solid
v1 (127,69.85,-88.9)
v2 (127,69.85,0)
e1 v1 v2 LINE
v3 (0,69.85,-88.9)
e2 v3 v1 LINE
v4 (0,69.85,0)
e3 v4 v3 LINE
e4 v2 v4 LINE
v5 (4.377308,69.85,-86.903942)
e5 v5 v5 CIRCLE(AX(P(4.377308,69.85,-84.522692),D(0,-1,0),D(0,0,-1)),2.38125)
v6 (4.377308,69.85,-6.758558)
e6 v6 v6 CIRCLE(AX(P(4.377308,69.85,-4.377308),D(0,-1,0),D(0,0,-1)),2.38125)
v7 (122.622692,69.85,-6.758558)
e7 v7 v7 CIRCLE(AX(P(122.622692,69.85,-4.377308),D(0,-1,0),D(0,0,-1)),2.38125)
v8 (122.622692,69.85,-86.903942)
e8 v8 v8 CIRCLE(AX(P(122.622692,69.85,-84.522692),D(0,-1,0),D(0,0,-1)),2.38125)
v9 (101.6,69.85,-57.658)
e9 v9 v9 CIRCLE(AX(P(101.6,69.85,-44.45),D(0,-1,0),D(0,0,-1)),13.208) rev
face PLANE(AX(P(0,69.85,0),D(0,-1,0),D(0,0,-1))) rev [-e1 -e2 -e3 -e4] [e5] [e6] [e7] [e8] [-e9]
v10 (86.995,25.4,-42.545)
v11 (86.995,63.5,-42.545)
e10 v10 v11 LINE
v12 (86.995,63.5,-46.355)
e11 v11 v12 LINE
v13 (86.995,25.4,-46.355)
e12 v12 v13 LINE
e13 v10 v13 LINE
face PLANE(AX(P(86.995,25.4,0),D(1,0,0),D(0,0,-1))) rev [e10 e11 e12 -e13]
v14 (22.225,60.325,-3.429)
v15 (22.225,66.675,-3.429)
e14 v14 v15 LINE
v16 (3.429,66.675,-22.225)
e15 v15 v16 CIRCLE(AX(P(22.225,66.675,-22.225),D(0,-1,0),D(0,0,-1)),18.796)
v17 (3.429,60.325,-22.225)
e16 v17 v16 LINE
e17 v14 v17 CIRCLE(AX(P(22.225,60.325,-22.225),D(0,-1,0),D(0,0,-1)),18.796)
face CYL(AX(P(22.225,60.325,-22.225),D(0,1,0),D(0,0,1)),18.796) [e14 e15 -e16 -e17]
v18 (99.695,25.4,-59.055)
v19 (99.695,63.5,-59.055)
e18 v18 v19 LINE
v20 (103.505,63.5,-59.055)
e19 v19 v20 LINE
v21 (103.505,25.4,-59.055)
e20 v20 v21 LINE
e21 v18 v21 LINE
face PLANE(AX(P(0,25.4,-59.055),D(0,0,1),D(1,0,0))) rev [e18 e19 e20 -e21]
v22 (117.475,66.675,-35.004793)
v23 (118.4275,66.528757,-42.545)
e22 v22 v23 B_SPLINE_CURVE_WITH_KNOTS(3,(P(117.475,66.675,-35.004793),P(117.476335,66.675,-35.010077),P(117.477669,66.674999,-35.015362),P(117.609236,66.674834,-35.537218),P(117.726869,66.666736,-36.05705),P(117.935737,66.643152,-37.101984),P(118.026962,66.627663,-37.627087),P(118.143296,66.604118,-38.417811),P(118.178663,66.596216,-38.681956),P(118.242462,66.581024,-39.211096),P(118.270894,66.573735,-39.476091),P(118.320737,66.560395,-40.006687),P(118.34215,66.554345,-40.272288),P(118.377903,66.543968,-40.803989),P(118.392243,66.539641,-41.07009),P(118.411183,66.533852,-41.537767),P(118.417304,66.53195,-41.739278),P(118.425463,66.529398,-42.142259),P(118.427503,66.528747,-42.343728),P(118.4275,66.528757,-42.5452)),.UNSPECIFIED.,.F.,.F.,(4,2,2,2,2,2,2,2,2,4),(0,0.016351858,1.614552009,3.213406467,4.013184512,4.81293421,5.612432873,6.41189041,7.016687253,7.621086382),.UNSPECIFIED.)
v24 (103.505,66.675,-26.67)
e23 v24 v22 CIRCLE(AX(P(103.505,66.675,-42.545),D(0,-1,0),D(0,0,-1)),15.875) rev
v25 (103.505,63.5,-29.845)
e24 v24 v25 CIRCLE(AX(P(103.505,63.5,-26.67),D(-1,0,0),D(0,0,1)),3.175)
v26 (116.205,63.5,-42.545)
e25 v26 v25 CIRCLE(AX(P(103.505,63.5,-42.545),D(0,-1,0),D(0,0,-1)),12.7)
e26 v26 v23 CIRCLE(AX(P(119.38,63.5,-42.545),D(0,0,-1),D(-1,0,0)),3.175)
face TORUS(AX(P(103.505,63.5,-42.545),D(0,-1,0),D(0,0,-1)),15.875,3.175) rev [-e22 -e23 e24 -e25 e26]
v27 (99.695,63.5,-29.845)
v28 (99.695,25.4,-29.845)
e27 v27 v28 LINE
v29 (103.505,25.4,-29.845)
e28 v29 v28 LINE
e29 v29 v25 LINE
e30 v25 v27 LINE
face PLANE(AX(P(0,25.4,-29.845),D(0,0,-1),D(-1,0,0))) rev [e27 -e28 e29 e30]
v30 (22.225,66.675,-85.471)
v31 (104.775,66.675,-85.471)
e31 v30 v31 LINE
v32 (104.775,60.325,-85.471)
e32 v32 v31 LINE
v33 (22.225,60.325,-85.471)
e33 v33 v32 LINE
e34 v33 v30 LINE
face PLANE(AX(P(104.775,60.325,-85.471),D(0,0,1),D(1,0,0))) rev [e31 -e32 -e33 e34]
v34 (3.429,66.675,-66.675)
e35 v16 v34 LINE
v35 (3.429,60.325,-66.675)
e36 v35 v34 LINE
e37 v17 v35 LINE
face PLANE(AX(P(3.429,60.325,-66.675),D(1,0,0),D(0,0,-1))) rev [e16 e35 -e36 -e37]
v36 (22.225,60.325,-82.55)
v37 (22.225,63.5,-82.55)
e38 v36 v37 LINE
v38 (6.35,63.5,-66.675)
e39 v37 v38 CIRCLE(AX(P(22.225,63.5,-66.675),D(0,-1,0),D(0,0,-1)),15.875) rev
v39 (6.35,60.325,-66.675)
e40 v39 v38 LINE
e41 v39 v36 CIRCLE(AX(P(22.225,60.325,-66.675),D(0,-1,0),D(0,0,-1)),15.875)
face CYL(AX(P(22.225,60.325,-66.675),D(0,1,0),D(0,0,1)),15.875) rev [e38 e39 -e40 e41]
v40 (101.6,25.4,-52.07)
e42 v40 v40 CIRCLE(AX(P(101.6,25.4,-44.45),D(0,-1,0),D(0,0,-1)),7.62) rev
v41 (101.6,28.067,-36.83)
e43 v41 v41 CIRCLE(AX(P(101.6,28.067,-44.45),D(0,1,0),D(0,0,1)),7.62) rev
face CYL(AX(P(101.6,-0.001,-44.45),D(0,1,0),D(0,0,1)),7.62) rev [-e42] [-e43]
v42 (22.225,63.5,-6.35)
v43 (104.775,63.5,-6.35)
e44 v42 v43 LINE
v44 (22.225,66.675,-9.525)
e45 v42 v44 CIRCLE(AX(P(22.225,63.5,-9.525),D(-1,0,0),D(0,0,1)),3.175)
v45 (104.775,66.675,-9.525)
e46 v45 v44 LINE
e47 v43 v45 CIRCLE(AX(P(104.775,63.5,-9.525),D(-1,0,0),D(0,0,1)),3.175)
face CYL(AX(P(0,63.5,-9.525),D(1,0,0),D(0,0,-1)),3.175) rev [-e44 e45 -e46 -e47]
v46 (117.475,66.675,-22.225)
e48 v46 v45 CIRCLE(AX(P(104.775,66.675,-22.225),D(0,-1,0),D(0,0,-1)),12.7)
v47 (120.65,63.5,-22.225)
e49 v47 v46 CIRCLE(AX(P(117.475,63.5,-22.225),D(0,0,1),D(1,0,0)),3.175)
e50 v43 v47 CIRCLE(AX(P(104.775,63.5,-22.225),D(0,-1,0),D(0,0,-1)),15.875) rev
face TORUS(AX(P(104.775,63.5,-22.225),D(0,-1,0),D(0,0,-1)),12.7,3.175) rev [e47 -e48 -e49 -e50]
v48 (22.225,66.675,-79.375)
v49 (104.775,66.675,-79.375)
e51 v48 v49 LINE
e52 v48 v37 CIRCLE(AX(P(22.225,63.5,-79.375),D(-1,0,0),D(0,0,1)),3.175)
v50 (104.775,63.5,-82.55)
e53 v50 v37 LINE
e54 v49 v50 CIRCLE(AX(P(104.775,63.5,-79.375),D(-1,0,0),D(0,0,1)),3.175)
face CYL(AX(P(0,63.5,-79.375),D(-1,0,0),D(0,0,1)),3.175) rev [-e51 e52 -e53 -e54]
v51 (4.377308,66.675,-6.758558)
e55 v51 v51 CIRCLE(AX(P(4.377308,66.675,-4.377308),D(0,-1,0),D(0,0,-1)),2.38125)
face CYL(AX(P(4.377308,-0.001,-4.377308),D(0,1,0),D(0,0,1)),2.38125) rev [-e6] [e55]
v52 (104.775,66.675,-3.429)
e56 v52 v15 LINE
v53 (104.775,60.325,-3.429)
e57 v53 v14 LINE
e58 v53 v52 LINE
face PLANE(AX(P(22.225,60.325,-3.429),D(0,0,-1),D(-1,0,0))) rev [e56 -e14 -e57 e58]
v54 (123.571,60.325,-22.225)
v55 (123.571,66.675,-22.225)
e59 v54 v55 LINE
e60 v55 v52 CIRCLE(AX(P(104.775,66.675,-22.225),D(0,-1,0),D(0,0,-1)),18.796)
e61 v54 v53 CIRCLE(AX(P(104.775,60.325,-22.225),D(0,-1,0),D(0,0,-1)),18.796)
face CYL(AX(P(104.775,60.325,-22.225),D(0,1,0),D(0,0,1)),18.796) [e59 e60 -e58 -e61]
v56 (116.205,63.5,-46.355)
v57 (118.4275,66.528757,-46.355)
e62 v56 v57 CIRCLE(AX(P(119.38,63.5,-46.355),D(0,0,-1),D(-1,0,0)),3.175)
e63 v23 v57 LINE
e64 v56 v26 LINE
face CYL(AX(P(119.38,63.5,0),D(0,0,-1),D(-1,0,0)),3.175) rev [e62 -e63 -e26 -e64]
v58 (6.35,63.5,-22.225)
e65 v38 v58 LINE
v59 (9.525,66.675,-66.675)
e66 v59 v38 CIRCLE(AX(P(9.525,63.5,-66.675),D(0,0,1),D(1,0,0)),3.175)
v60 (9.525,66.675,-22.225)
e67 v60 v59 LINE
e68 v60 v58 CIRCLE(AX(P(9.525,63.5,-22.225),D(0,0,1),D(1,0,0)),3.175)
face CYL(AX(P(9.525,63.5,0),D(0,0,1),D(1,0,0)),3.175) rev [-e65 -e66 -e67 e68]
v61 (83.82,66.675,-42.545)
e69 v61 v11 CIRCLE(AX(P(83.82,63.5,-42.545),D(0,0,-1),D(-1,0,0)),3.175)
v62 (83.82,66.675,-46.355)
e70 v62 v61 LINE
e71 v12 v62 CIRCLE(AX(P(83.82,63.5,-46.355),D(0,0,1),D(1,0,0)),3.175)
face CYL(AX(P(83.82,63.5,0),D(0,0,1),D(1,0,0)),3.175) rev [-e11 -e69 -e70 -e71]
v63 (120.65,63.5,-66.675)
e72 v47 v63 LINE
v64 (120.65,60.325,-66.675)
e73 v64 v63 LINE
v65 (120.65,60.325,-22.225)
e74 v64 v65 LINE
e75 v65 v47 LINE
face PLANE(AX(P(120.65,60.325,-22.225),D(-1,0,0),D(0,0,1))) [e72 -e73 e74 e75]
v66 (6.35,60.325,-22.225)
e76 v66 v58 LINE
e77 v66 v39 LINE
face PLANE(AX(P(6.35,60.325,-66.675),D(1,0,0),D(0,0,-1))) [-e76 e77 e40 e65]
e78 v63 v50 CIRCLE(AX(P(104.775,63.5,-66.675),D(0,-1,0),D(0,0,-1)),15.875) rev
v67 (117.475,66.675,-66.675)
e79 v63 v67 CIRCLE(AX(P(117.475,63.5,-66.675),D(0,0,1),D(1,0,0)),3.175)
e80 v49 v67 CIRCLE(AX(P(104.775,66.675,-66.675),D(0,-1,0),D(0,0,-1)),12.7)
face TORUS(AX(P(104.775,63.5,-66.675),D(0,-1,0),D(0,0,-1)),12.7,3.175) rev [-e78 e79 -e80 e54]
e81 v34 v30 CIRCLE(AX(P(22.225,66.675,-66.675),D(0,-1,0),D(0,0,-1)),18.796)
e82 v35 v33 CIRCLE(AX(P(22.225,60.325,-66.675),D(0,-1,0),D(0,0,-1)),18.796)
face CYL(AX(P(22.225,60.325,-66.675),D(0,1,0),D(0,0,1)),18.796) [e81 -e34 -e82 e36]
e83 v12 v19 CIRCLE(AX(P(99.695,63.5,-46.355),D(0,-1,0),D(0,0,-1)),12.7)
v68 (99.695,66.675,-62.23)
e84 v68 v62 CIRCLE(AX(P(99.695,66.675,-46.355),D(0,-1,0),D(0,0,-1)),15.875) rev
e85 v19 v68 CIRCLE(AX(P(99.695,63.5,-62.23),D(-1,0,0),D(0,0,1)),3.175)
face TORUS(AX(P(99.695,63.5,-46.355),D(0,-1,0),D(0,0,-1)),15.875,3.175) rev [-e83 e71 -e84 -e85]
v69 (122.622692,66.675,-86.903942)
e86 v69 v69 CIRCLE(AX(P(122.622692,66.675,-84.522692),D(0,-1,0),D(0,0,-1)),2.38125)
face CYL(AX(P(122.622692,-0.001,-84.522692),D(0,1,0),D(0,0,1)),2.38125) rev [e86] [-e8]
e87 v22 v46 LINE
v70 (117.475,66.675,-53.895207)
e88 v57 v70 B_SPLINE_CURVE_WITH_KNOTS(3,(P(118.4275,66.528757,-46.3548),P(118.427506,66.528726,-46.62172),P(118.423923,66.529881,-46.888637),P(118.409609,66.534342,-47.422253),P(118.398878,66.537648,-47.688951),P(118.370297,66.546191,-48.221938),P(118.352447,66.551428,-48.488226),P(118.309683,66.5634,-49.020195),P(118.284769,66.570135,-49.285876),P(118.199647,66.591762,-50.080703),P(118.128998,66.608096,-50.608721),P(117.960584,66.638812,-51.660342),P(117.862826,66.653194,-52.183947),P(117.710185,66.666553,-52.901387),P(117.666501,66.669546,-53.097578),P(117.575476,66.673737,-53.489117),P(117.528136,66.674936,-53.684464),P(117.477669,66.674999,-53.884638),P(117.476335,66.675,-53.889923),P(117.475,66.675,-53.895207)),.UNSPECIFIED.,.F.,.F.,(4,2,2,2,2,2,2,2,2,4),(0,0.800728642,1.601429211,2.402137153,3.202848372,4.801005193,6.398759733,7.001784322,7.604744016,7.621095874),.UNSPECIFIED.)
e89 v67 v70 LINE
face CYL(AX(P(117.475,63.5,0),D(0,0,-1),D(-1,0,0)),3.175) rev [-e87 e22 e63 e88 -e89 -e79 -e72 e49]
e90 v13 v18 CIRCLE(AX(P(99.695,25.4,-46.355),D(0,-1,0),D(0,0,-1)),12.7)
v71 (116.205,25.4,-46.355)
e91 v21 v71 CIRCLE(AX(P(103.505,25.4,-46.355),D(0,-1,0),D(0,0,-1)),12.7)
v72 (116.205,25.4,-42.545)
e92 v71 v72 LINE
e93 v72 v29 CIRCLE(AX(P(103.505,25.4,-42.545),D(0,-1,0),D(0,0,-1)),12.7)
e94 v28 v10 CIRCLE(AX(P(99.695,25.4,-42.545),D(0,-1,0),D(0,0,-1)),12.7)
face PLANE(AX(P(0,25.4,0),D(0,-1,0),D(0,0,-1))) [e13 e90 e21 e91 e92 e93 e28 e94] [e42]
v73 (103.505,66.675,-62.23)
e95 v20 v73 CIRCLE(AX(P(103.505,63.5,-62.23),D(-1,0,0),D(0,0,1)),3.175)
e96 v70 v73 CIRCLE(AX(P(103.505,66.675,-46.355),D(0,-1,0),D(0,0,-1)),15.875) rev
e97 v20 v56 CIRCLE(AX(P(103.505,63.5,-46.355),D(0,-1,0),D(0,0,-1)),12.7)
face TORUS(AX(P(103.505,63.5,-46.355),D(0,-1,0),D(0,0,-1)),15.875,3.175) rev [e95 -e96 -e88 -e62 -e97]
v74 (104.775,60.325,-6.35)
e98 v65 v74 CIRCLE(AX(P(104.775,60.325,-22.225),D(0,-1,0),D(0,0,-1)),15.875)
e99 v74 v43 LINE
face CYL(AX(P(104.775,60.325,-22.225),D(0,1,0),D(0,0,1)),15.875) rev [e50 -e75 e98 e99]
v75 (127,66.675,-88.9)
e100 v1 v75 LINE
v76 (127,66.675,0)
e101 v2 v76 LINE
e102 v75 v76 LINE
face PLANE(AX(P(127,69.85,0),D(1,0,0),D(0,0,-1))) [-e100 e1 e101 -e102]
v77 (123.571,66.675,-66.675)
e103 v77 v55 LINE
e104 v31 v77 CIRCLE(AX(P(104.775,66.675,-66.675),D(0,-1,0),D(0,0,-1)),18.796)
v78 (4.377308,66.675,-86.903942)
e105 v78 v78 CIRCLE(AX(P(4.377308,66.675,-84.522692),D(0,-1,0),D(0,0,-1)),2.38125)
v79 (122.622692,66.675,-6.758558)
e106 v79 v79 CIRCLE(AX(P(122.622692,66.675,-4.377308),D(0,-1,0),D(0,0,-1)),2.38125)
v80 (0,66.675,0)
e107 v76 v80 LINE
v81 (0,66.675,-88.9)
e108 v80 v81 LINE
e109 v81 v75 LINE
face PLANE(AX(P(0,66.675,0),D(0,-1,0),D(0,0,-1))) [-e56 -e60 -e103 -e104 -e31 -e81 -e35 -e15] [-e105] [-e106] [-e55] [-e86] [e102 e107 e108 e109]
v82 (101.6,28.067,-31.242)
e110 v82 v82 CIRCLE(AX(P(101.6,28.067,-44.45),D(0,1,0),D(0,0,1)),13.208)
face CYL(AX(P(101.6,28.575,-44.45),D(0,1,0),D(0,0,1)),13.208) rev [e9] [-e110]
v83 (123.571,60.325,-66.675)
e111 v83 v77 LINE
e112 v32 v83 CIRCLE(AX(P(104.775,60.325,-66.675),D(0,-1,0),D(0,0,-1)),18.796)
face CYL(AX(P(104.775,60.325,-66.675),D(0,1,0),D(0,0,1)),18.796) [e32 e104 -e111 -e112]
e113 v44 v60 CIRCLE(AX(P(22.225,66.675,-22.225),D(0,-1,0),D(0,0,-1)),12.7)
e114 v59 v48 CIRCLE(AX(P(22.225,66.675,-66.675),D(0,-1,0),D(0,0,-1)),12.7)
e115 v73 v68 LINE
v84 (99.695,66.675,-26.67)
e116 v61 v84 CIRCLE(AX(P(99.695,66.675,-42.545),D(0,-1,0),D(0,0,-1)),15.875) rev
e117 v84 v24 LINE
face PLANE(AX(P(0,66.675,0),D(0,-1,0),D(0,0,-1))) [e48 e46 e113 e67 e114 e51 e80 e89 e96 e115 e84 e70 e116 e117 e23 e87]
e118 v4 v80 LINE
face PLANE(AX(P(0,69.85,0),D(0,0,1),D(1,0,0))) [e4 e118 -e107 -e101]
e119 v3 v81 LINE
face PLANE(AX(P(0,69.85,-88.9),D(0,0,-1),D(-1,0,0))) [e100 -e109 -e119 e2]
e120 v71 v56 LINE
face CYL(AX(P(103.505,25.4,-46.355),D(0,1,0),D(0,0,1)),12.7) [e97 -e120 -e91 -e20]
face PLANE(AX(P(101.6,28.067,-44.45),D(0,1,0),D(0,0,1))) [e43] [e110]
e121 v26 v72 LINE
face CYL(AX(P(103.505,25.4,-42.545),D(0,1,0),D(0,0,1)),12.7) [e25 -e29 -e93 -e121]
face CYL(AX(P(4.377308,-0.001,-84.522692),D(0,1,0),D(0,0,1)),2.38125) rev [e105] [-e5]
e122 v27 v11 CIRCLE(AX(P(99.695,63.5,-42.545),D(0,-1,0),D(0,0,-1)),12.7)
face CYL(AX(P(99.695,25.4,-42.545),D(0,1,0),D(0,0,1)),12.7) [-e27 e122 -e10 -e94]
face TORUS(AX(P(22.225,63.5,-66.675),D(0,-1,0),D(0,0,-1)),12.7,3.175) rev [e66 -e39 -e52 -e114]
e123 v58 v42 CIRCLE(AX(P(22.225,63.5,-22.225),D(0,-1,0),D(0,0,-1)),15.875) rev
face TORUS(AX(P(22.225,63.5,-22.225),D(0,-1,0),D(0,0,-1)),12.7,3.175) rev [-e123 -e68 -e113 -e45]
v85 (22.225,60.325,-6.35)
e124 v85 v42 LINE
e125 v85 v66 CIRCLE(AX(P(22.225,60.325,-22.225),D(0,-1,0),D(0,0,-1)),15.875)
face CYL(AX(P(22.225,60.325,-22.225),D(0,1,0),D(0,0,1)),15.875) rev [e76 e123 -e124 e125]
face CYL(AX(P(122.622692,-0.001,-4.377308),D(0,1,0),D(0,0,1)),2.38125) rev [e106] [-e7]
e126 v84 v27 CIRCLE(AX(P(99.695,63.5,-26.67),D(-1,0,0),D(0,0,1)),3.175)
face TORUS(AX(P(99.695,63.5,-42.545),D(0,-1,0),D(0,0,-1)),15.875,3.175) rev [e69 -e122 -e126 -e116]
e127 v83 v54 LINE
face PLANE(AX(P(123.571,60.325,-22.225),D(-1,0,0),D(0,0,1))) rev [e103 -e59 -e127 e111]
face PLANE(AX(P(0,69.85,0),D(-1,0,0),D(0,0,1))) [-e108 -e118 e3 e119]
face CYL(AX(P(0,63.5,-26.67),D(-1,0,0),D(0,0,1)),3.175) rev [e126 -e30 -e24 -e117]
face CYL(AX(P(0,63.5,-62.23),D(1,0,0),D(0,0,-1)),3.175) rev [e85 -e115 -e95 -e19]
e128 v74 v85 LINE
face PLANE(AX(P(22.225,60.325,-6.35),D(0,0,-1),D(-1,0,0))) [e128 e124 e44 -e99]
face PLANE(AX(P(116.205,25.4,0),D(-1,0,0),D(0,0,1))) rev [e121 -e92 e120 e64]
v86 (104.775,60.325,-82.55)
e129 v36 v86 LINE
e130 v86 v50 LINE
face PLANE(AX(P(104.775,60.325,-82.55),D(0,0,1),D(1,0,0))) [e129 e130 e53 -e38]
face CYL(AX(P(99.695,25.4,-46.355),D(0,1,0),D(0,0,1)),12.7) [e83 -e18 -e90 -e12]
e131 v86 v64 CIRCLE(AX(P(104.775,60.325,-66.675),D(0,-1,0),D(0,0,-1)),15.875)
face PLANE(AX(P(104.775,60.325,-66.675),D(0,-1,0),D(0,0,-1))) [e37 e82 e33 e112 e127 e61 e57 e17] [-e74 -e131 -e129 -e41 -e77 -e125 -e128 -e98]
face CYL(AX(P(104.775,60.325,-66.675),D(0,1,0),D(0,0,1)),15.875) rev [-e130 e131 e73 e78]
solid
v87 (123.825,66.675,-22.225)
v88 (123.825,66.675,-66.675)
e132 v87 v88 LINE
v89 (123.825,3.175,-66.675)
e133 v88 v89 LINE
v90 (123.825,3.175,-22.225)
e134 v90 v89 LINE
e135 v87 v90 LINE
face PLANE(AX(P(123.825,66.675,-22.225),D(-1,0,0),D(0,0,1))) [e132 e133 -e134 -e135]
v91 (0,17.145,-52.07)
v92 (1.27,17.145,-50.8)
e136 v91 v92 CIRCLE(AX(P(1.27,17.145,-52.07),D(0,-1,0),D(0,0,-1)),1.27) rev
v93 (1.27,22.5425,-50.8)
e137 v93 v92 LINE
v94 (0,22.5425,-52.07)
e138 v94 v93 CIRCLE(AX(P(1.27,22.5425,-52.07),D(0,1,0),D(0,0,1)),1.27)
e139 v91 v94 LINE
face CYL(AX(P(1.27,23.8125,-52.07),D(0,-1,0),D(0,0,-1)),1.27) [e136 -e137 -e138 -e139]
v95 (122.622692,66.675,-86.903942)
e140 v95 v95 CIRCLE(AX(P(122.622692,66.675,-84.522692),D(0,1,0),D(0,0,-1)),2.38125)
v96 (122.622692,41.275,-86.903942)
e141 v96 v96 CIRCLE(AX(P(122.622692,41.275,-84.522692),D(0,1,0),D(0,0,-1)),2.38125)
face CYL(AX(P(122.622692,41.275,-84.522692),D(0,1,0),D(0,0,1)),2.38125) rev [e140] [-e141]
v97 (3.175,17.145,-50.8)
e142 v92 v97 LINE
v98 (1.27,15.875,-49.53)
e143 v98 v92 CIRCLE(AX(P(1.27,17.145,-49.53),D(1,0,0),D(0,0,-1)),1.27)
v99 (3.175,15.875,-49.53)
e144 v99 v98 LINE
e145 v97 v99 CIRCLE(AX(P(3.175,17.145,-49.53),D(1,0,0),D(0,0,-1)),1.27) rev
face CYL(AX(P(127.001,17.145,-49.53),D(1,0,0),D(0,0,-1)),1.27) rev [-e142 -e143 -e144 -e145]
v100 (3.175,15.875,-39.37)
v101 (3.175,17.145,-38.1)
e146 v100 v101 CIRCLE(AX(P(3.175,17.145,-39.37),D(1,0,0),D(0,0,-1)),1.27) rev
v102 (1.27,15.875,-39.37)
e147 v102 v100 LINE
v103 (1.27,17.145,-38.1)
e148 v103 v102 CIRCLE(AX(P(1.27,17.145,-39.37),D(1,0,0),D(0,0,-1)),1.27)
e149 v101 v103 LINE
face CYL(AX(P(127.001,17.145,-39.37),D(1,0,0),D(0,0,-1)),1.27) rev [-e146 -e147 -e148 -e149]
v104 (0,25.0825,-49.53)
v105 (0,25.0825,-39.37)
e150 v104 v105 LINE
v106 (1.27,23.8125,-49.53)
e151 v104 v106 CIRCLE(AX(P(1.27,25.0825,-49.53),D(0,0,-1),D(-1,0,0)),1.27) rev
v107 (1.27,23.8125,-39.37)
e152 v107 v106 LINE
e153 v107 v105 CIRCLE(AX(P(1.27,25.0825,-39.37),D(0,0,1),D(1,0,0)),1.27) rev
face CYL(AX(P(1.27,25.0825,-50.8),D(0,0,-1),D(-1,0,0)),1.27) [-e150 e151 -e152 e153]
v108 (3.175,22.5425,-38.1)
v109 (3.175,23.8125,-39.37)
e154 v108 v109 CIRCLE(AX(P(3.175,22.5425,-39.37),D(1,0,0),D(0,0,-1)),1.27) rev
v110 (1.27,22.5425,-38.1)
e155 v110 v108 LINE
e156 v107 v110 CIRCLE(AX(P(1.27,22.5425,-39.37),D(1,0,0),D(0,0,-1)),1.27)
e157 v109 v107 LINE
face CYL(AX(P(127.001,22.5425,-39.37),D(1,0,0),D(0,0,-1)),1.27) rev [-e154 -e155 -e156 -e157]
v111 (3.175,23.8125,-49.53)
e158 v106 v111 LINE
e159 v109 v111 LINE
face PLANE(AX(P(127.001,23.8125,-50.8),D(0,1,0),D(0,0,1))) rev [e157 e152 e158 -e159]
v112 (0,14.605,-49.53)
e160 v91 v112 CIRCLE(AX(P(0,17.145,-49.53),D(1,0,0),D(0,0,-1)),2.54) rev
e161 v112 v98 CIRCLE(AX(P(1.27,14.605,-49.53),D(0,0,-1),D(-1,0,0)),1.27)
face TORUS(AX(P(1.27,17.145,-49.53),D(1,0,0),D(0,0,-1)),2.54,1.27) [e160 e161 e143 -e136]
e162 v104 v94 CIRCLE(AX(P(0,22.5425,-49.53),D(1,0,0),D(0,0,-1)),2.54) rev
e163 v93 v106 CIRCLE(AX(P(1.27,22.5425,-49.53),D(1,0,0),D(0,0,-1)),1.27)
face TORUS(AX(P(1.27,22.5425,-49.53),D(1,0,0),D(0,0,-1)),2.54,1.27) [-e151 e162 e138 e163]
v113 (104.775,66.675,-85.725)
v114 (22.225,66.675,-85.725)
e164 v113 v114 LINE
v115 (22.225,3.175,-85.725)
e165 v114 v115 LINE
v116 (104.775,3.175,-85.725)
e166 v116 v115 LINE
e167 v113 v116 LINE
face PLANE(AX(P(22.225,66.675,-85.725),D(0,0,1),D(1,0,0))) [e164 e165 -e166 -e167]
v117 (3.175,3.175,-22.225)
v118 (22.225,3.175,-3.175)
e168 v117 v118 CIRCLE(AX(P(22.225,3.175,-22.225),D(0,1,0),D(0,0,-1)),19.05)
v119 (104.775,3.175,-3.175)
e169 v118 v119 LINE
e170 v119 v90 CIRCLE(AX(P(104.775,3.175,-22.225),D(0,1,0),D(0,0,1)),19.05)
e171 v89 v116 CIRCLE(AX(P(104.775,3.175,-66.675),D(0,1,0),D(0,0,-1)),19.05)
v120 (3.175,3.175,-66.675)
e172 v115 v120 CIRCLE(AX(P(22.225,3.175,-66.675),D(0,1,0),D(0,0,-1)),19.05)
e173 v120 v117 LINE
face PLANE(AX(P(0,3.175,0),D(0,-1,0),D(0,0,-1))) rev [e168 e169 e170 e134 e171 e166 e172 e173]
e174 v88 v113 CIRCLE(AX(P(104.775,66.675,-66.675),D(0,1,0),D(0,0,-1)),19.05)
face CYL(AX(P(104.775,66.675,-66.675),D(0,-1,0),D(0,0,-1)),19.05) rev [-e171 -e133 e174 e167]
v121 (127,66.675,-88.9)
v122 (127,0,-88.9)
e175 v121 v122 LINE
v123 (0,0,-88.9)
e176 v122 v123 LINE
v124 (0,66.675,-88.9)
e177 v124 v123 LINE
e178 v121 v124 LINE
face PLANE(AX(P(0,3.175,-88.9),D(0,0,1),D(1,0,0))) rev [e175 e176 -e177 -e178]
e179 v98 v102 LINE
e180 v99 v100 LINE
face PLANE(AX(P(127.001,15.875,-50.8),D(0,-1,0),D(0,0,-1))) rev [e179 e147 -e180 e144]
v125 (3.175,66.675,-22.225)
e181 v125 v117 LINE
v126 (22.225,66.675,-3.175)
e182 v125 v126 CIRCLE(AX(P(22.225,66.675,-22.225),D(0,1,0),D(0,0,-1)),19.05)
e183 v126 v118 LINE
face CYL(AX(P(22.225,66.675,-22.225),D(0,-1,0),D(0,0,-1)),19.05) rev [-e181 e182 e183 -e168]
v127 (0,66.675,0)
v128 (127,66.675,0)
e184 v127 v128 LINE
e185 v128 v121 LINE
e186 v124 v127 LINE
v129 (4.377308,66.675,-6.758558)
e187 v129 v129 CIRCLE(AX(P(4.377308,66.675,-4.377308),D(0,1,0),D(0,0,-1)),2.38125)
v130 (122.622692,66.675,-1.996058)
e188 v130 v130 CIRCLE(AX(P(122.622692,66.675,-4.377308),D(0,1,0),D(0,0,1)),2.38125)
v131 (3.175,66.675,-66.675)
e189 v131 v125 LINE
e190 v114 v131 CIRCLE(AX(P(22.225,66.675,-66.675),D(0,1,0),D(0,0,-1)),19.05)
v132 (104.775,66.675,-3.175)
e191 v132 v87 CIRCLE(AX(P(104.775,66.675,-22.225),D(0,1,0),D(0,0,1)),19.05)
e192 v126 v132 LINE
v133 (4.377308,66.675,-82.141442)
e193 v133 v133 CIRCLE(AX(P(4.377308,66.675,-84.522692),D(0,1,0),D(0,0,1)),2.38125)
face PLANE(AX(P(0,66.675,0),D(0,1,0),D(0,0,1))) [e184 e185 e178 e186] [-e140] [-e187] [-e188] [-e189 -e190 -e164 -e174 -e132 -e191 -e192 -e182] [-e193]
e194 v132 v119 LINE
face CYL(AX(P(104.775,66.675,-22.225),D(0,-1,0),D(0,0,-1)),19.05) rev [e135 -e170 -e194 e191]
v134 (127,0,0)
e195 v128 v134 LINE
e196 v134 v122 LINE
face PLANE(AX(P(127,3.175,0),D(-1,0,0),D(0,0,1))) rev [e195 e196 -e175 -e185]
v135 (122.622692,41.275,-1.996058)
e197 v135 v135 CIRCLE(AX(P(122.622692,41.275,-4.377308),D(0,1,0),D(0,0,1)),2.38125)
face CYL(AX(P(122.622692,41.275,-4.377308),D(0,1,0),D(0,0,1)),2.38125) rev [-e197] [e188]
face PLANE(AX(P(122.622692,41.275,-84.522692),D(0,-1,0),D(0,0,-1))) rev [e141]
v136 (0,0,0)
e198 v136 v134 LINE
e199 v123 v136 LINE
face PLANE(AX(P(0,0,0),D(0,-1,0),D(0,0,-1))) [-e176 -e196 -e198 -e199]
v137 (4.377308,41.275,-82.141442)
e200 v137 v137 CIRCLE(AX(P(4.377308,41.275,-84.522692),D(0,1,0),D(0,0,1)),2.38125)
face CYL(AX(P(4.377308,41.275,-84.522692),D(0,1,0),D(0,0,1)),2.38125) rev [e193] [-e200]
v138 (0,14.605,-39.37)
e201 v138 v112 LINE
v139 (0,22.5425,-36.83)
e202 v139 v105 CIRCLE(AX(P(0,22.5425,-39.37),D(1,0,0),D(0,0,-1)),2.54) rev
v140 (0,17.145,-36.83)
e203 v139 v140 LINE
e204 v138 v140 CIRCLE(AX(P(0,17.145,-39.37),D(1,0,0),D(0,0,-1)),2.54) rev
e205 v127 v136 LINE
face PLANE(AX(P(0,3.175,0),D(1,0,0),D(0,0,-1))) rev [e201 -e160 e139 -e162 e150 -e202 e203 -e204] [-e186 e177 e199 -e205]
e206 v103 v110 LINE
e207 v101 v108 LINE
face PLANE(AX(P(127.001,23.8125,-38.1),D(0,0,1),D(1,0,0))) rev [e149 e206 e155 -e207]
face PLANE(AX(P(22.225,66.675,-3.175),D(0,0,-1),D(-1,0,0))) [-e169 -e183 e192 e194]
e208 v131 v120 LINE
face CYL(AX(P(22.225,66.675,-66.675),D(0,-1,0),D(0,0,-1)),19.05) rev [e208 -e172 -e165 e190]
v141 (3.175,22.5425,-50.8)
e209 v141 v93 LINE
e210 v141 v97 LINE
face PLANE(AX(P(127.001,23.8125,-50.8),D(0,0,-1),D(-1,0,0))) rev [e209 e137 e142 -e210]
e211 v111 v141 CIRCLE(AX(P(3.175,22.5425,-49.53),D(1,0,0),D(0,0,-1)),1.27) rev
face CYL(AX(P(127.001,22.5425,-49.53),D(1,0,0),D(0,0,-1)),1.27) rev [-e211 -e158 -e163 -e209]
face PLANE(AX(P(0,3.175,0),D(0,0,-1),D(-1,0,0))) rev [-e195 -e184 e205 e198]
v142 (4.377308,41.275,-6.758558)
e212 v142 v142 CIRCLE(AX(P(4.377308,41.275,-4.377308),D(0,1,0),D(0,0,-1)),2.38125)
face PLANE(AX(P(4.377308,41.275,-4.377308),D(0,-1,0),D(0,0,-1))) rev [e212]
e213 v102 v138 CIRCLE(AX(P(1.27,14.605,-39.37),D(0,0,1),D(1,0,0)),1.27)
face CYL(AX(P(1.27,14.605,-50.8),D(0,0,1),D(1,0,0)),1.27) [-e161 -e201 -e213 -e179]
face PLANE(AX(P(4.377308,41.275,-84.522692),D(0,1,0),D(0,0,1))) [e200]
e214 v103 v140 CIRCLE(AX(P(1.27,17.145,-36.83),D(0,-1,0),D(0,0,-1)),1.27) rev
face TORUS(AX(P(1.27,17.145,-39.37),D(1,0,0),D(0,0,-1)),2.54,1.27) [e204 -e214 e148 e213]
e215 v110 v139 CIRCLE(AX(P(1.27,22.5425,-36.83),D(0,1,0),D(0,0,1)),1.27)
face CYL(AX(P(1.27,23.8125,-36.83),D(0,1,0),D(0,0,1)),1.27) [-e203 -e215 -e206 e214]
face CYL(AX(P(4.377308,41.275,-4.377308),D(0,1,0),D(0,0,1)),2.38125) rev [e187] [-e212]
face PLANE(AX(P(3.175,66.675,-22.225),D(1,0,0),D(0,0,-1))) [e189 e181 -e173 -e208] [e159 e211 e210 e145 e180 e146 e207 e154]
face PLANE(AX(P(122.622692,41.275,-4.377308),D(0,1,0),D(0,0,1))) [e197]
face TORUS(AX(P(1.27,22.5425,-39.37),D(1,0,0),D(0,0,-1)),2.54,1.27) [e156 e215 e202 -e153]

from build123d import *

# Parameters (mm, degrees)
SKETCH1_W           = 127
SKETCH1_H           = 88.9
BOSS_EXTRUDE1_DEPTH = 3.175
SKETCH2_W           = 127
SKETCH2_H           = 88.9
BOSS_EXTRUDE2_DEPTH = 63.5
BOSS_EXTRUDE3_START = 66.675
SKETCH1_2_W         = 127
SKETCH1_2_H         = 88.9
BOSS_EXTRUDE3_DEPTH = 3.175
SKETCH3_R           = 2.38125
CUT_EXTRUDE1_DEPTH  = 25.4
CUT_EXTRUDE2_START  = 3.175
SKETCH3_2_R         = 2.38125
CUT_EXTRUDE2_DEPTH  = 28.575
SKETCH4_R           = 7.62
CUT_EXTRUDE3_DEPTH  = 3.175
SKETCH5_W           = 12.7
SKETCH5_H           = 7.9375
CUT_EXTRUDE4_DEPTH  = 3.175
FILLET1_R           = 1.27
BOSS_EXTRUDE4_REACH = 169.675
SKETCH6_W           = 6.35
SKETCH6_H           = 9.525
MOVE_FACE1_BY       = 0.254
MOVE_FACE1_2_BY     = 0.254
MOVE_FACE1_3_BY     = 0.254
MOVE_FACE1_4_BY     = 0.254
BOSS_EXTRUDE5_REACH = 158.51
SKETCH7_W           = 6.35
SKETCH7_H           = 9.525
BOSS_EXTRUDE6_START = -3.175
SKETCH8_W           = 29.21
SKETCH8_H           = 29.21
BOSS_EXTRUDE6_DEPTH = 44.45
SKETCH4_3_R         = 7.62
CUT_EXTRUDE5_DEPTH  = 44.45
SKETCH9_R           = 12.7
CUT_EXTRUDE6_DEPTH  = 41.275
MOVE_FACE2_BY       = 0.508
MOVE_FACE3_BY       = 0.508
CUT_EXTRUDE7_DEPTH  = 9.525
BOSS_EXTRUDE7_START = 6.35
BOSS_EXTRUDE7_DEPTH = 6.35
FILLET4_R           = 12.7
FILLET5_R           = 3.175
MOVE_FACE4_BY       = 0.254
MOVE_FACE4_2_BY     = 0.254
MOVE_FACE4_3_BY     = 0.254
MOVE_FACE4_4_BY     = 0.254
MOVE_FACE4_5_BY     = 0.254
MOVE_FACE4_6_BY     = 0.254
MOVE_FACE4_7_BY     = 0.254
MOVE_FACE4_8_BY     = 0.254


with BuildPart() as part:
    # Sketch1 → Boss-Extrude1 (new body)
    with BuildSketch(Plane(origin=(0, 0, 0), x_dir=(1, 0, 0), z_dir=(0, 1, 0))):
        with Locations((63.5, 44.45)):
            Rectangle(SKETCH1_W, SKETCH1_H)
    extrude(amount=BOSS_EXTRUDE1_DEPTH)

    # Sketch2 → Boss-Extrude2 (add)
    with BuildSketch(Plane(origin=(0, 3.175, 0), x_dir=(1, 0, 0), z_dir=(0, 1, 0))):
        with Locations((63.5, 44.45)):
            Rectangle(SKETCH2_W, SKETCH2_H)
        with BuildLine():
            Line((22.225, 3.175), (104.775, 3.175))
            ThreePointArc((104.775, 3.175), (118.245384182, 8.754615818), (123.825, 22.225))
            Line((123.825, 22.225), (123.825, 66.675))
            ThreePointArc((123.825, 66.675), (118.245384182, 80.145384182), (104.775, 85.725))
            Line((104.775, 85.725), (22.225, 85.725))
            ThreePointArc((22.225, 85.725), (8.754615818, 80.145384182), (3.175, 66.675))
            Line((3.175, 66.675), (3.175, 22.225))
            ThreePointArc((3.175, 22.225), (8.754615818, 8.754615818), (22.225, 3.175))
        make_face(mode=Mode.SUBTRACT)
    extrude(amount=BOSS_EXTRUDE2_DEPTH)

    # Sketch3 → Cut-Extrude1 (cut)
    with BuildSketch(Plane(origin=(0, 66.675, 0), x_dir=(1, 0, 0), z_dir=(0, 1, 0))):
        with Locations(Location((4.377307909, 84.522692091, 0), (0, 0, 270))):
            Circle(SKETCH3_R)
        with Locations(Location((122.622692091, 4.377307909, 0), (0, 0, 270))):
            Circle(SKETCH3_R)
        with Locations(Location((122.622692091, 84.522692091, 0), (0, 0, 90))):
            Circle(SKETCH3_R)
        with Locations(Location((4.377307909, 4.377307909, 0), (0, 0, 90))):
            Circle(SKETCH3_R)
    extrude(amount=-CUT_EXTRUDE1_DEPTH, mode=Mode.SUBTRACT)

    # Sketch5 → Cut-Extrude4 (cut)
    with BuildSketch(Plane.ZY):
        with Locations((-44.45, 19.84375)):
            Rectangle(SKETCH5_W, SKETCH5_H)
    extrude(amount=-CUT_EXTRUDE4_DEPTH, mode=Mode.SUBTRACT)

    # Fillet1
    fillet1_edges = [part.edges().sort_by_distance(p)[0] for p in [
        (0, 19.84375, -38.1),
        (0, 23.8125, -44.45),
        (0, 19.84375, -50.8),
        (0, 15.875, -44.45),
        (1.5875, 23.8125, -50.8),
        (1.5875, 15.875, -50.8),
        (1.5875, 15.875, -38.1),
        (1.5875, 23.8125, -38.1),
    ]]
    fillet(fillet1_edges, radius=FILLET1_R)


with BuildPart() as body_2:
    # Sketch1<2> → Boss-Extrude3 (new body)
    with BuildSketch(Plane(origin=(0, 0, 0), x_dir=(1, 0, 0), z_dir=(0, 1, 0)).offset(BOSS_EXTRUDE3_START)):
        with Locations((63.5, 44.45)):
            Rectangle(SKETCH1_2_W, SKETCH1_2_H)
    extrude(amount=BOSS_EXTRUDE3_DEPTH)

    # Sketch3<2> → Cut-Extrude2 (cut)
    with BuildSketch(Plane(origin=(0, 66.675, 0), x_dir=(1, 0, 0), z_dir=(0, 1, 0)).offset(CUT_EXTRUDE2_START)):
        with Locations(Location((4.377307909, 84.522692091, 0), (0, 0, 90))):
            Circle(SKETCH3_2_R)
        with Locations(Location((122.622692091, 4.377307909, 0), (0, 0, 90))):
            Circle(SKETCH3_2_R)
        with Locations(Location((122.622692091, 84.522692091, 0), (0, 0, 90))):
            Circle(SKETCH3_2_R)
        with Locations(Location((4.377307909, 4.377307909, 0), (0, 0, 90))):
            Circle(SKETCH3_2_R)
    extrude(amount=-CUT_EXTRUDE2_DEPTH, mode=Mode.SUBTRACT)

    # Sketch4 → Cut-Extrude3 (cut)
    with BuildSketch(Plane(origin=(0, 69.85, 0), x_dir=(1, 0, 0), z_dir=(0, 1, 0))):
        with Locations(Location((101.6, 44.45, 0), (0, 0, 270))):
            Circle(SKETCH4_R)
    extrude(amount=-CUT_EXTRUDE3_DEPTH, mode=Mode.SUBTRACT)


    # Sketch6 → Boss-Extrude4 (add, up to next)
    with BuildSketch(Plane.ZY.offset(-123.825), mode=Mode.PRIVATE) as boss_extrude4_sk1:
        with Locations((-62.23, 61.9125)):
            Rectangle(SKETCH6_W, SKETCH6_H)
    boss_extrude4_tool1 = extrude(boss_extrude4_sk1.sketch, amount=BOSS_EXTRUDE4_REACH, mode=Mode.PRIVATE) - part.part
    # Sketch6 → Boss-Extrude4 (add, up to next)
    with BuildSketch(Plane.ZY.offset(-123.825), mode=Mode.PRIVATE) as boss_extrude4_sk2:
        with Locations((-26.67, 61.9125)):
            Rectangle(SKETCH6_W, SKETCH6_H)
    boss_extrude4_tool2 = extrude(boss_extrude4_sk2.sketch, amount=BOSS_EXTRUDE4_REACH, mode=Mode.PRIVATE) - part.part
    add(boss_extrude4_tool1.solids().sort_by_distance((123.825, 61.9125, -62.23))[0])
    add(boss_extrude4_tool2.solids().sort_by_distance((123.825, 61.9125, -26.67))[0])

    # Move Face1: a face moved inward by 0.254
    extrude(body_2.faces().sort_by_distance((123.825, 61.9125, -62.23))[0], amount=MOVE_FACE1_BY, dir=(-1, 0, 0), mode=Mode.SUBTRACT)

    # Move Face1 2: a face moved inward by 0.254
    extrude(body_2.faces().sort_by_distance((123.825, 61.9125, -26.67))[0], amount=MOVE_FACE1_2_BY, dir=(-1, 0, 0), mode=Mode.SUBTRACT)

    # Move Face1 3: a face moved inward by 0.254
    extrude(body_2.faces().sort_by_distance((3.175, 61.9125, -26.67))[0], amount=MOVE_FACE1_3_BY, dir=(1, 0, 0), mode=Mode.SUBTRACT)

    # Move Face1 4: a face moved inward by 0.254
    extrude(body_2.faces().sort_by_distance((3.175, 61.9125, -62.23))[0], amount=MOVE_FACE1_4_BY, dir=(1, 0, 0), mode=Mode.SUBTRACT)

    # Sketch7 → Boss-Extrude5 (add, up to next)
    with BuildSketch(Plane.XY.offset(-59.055), mode=Mode.PRIVATE) as boss_extrude5_sk1:
        with Locations((25.654, 61.9125)):
            Rectangle(SKETCH7_W, SKETCH7_H)
    boss_extrude5_tool1 = extrude(boss_extrude5_sk1.sketch, amount=BOSS_EXTRUDE5_REACH, mode=Mode.PRIVATE) - body_2.part
    add(boss_extrude5_tool1.solids().sort_by_distance((25.654, 61.9125, -59.055))[0])

    # Sketch8 → Boss-Extrude6 (add)
    with BuildSketch(Plane.XZ.offset(-66.675).offset(BOSS_EXTRUDE6_START)):
        with Locations((101.6, -44.45)):
            Rectangle(SKETCH8_W, SKETCH8_H)
    extrude(amount=BOSS_EXTRUDE6_DEPTH)

    # Sketch4<3> → Cut-Extrude5 (cut)
    with BuildSketch(Plane(origin=(0, 69.85, 0), x_dir=(1, 0, 0), z_dir=(0, 1, 0))):
        with Locations(Location((101.6, 44.45, 0), (0, 0, 270))):
            Circle(SKETCH4_3_R)
    extrude(amount=-CUT_EXTRUDE5_DEPTH, mode=Mode.SUBTRACT)

    # Sketch9 → Cut-Extrude6 (cut)
    with BuildSketch(Plane(origin=(0, 69.85, 0), x_dir=(1, 0, 0), z_dir=(0, 1, 0))):
        with Locations(Location((101.6, 44.45, 0), (0, 0, 270))):
            Circle(SKETCH9_R)
    extrude(amount=-CUT_EXTRUDE6_DEPTH, mode=Mode.SUBTRACT)

    # Move Face2: a curved face moved inward by 0.508
    add(Solid.thicken(body_2.faces().sort_by_distance((101.6, 49.2125, -57.15))[0], -MOVE_FACE2_BY), mode=Mode.SUBTRACT)

    # Move Face3: a face moved inward by 0.508
    extrude(body_2.faces().sort_by_distance((91.0336, 28.575, -44.45))[0], amount=MOVE_FACE3_BY, dir=(0, -1, 0), mode=Mode.SUBTRACT)

    # Sketch10 → Cut-Extrude7 (cut)
    with BuildSketch(Plane.XZ.offset(-57.15)):
        Polygon((22.479, -59.055), (3.429, -59.055), (3.429, -65.405), (123.571, -65.405), (123.571, -59.055), (116.205, -59.055), (86.995, -59.055), (28.829, -59.055), (28.829, -29.845), (86.995, -29.845), (116.205, -29.845), (123.571, -29.845), (123.571, -23.495), (3.429, -23.495), (3.429, -29.845), (22.479, -29.845), align=None)
    extrude(amount=-CUT_EXTRUDE7_DEPTH, mode=Mode.SUBTRACT)

    # Sketch11 → Boss-Extrude7 (add)
    with BuildSketch(Plane.XZ.offset(-66.675).offset(BOSS_EXTRUDE7_START)):
        with BuildLine():
            Line((123.825, -22.225), (123.825, -66.675))
            ThreePointArc((123.825, -66.675), (118.245384182, -80.145384182), (104.775, -85.725))
            Line((104.775, -85.725), (22.225, -85.725))
            ThreePointArc((22.225, -85.725), (8.754615818, -80.145384182), (3.175, -66.675))
            Line((3.175, -66.675), (3.175, -22.225))
            ThreePointArc((3.175, -22.225), (8.754615818, -8.754615818), (22.225, -3.175))
            Line((22.225, -3.175), (104.775, -3.175))
            ThreePointArc((104.775, -3.175), (118.245384182, -8.754615818), (123.825, -22.225))
        make_face()
        with BuildLine():
            Line((22.225, -6.35), (104.775, -6.35))
            ThreePointArc((104.775, -6.35), (116.000320151, -10.999679849), (120.65, -22.225))
            Line((120.65, -22.225), (120.65, -66.675))
            ThreePointArc((120.65, -66.675), (116.000320151, -77.900320151), (104.775, -82.55))
            Line((104.775, -82.55), (22.225, -82.55))
            ThreePointArc((22.225, -82.55), (10.999679849, -77.900320151), (6.35, -66.675))
            Line((6.35, -66.675), (6.35, -22.225))
            ThreePointArc((6.35, -22.225), (10.999679849, -10.999679849), (22.225, -6.35))
        make_face(mode=Mode.SUBTRACT)
    extrude(amount=-BOSS_EXTRUDE7_DEPTH)

    # Fillet4
    fillet4_edges = [body_2.edges().sort_by_distance(p)[0] for p in [
        (116.205, 46.0375, -29.845),
        (86.995, 46.0375, -59.055),
        (116.205, 46.0375, -59.055),
        (86.995, 46.0375, -29.845),
    ]]
    fillet(fillet4_edges, radius=FILLET4_R)

    # Fillet5
    # the kernel refuses this fillet: 3.175 mm, written as the material it adds along each edge
    with BuildSketch(Plane(origin=(104.775, 66.675, -66.675), x_dir=(1, 0, 0), z_dir=(0, 0, 1))) as fillet5_piece_1:
        with BuildLine():
            CenterArc((15.875 - FILLET5_R, -FILLET5_R), FILLET5_R, 0, 90)
            Line((15.875, -FILLET5_R), (15.875, 0))
            Line((15.875, 0), (15.875 - FILLET5_R, 0))
        make_face()
    revolve(axis=Axis((104.775, 66.675, -66.675), (0, 1, 0)), revolution_arc=90)
    with BuildSketch(Plane(origin=(120.65, 66.675, -22.225), x_dir=(-1, 0, 0), z_dir=(0, 0, -1)), Plane(origin=(6.35, 66.675, -66.675), x_dir=(1, 0, 0), z_dir=(0, 0, 1))) as fillet5_piece_2:
        with BuildLine():
            CenterArc((FILLET5_R, -FILLET5_R), FILLET5_R, 90, 90)
            Line((0, -FILLET5_R), (0, 0))
            Line((0, 0), (FILLET5_R, 0))
        make_face()
    extrude(amount=44.45)
    with BuildSketch(Plane(origin=(104.775, 66.675, -22.225), x_dir=(0, 0, 1), z_dir=(-1, 0, 0))) as fillet5_piece_3:
        with BuildLine():
            CenterArc((15.875 - FILLET5_R, -FILLET5_R), FILLET5_R, 0, 90)
            Line((15.875, -FILLET5_R), (15.875, 0))
            Line((15.875, 0), (15.875 - FILLET5_R, 0))
        make_face()
    revolve(axis=Axis((104.775, 66.675, -22.225), (0, 1, 0)), revolution_arc=90)
    with BuildSketch(Plane(origin=(22.225, 66.675, -6.35), x_dir=(0, 0, -1), z_dir=(1, 0, 0)), Plane(origin=(104.775, 66.675, -82.55), x_dir=(0, 0, 1), z_dir=(-1, 0, 0))) as fillet5_piece_4:
        with BuildLine():
            CenterArc((FILLET5_R, -FILLET5_R), FILLET5_R, 90, 90)
            Line((0, -FILLET5_R), (0, 0))
            Line((0, 0), (FILLET5_R, 0))
        make_face()
    extrude(amount=82.55)
    with BuildSketch(Plane(origin=(22.225, 66.675, -22.225), x_dir=(-1, 0, 0), z_dir=(0, 0, -1))) as fillet5_piece_5:
        with BuildLine():
            CenterArc((15.875 - FILLET5_R, -FILLET5_R), FILLET5_R, 0, 90)
            Line((15.875, -FILLET5_R), (15.875, 0))
            Line((15.875, 0), (15.875 - FILLET5_R, 0))
        make_face()
    revolve(axis=Axis((22.225, 66.675, -22.225), (0, 1, 0)), revolution_arc=90)
    with BuildSketch(Plane(origin=(22.225, 66.675, -66.675), x_dir=(0, 0, -1), z_dir=(1, 0, 0))) as fillet5_piece_6:
        with BuildLine():
            CenterArc((15.875 - FILLET5_R, -FILLET5_R), FILLET5_R, 0, 90)
            Line((15.875, -FILLET5_R), (15.875, 0))
            Line((15.875, 0), (15.875 - FILLET5_R, 0))
        make_face()
    revolve(axis=Axis((22.225, 66.675, -66.675), (0, 1, 0)), revolution_arc=90)
    with BuildSketch(Plane(origin=(99.695, 66.675, -29.845), x_dir=(0, 0, 1), z_dir=(1, 0, 0)), Plane(origin=(116.205, 66.675, -42.545), x_dir=(1, 0, 0), z_dir=(0, 0, -1)), Plane(origin=(103.505, 66.675, -59.055), x_dir=(0, 0, -1), z_dir=(-1, 0, 0)), Plane(origin=(86.995, 66.675, -46.355), x_dir=(-1, 0, 0), z_dir=(0, 0, 1))) as fillet5_piece_7:
        with BuildLine():
            CenterArc((FILLET5_R, FILLET5_R), FILLET5_R, 180, 90)
            Line((0, FILLET5_R), (0, 0))
            Line((0, 0), (FILLET5_R, 0))
        make_face()
    extrude(amount=3.81)
    with BuildSketch(Plane(origin=(103.505, 66.675, -42.545), x_dir=(1, 0, 0), z_dir=(0, 0, -1))) as fillet5_piece_8:
        with BuildLine():
            CenterArc((12.7 + FILLET5_R, FILLET5_R), FILLET5_R, 180, 90)
            Line((12.7, FILLET5_R), (12.7, 0))
            Line((12.7, 0), (12.7 + FILLET5_R, 0))
        make_face()
    revolve(axis=Axis((103.505, 66.675, -42.545), (0, -1, 0)), revolution_arc=90)
    with BuildSketch(Plane(origin=(103.505, 66.675, -46.355), x_dir=(1, 0, 0), z_dir=(0, 0, 1))) as fillet5_piece_9:
        with BuildLine():
            CenterArc((12.7 + FILLET5_R, -FILLET5_R), FILLET5_R, 90, 90)
            Line((12.7, -FILLET5_R), (12.7, 0))
            Line((12.7, 0), (12.7 + FILLET5_R, 0))
        make_face()
    revolve(axis=Axis((103.505, 66.675, -46.355), (0, 1, 0)), revolution_arc=90)
    with BuildSketch(Plane(origin=(99.695, 66.675, -46.355), x_dir=(0, 0, -1), z_dir=(1, 0, 0))) as fillet5_piece_10:
        with BuildLine():
            CenterArc((12.7 + FILLET5_R, -FILLET5_R), FILLET5_R, 90, 90)
            Line((12.7, -FILLET5_R), (12.7, 0))
            Line((12.7, 0), (12.7 + FILLET5_R, 0))
        make_face()
    revolve(axis=Axis((99.695, 66.675, -46.355), (0, 1, 0)), revolution_arc=90)
    with BuildSketch(Plane(origin=(99.695, 66.675, -42.545), x_dir=(0, 0, 1), z_dir=(1, 0, 0))) as fillet5_piece_11:
        with BuildLine():
            CenterArc((12.7 + FILLET5_R, FILLET5_R), FILLET5_R, 180, 90)
            Line((12.7, FILLET5_R), (12.7, 0))
            Line((12.7, 0), (12.7 + FILLET5_R, 0))
        make_face()
    revolve(axis=Axis((99.695, 66.675, -42.545), (0, -1, 0)), revolution_arc=90)

    # Move Face4: a curved face moved inward by 0.254
    add(Solid.thicken(body_2.faces().sort_by_distance((8.754615818, 63.5, -8.754615818))[0], -MOVE_FACE4_BY), mode=Mode.SUBTRACT)

    # Move Face4 2: a face moved inward by 0.254
    extrude(body_2.faces().sort_by_distance((3.175, 63.5, -44.45))[0], amount=MOVE_FACE4_2_BY, dir=(1, 0, 0), mode=Mode.SUBTRACT)

    # Move Face4 3: a curved face moved inward by 0.254
    add(Solid.thicken(body_2.faces().sort_by_distance((8.754615818, 63.5, -80.145384182))[0], -MOVE_FACE4_3_BY), mode=Mode.SUBTRACT)

    # Move Face4 4: a face moved inward by 0.254
    extrude(body_2.faces().sort_by_distance((63.5, 63.5, -85.725))[0], amount=MOVE_FACE4_4_BY, dir=(0, 0, 1), mode=Mode.SUBTRACT)

    # Move Face4 5: a curved face moved inward by 0.254
    add(Solid.thicken(body_2.faces().sort_by_distance((118.245384182, 63.5, -80.145384182))[0], -MOVE_FACE4_5_BY), mode=Mode.SUBTRACT)

    # Move Face4 6: a face moved inward by 0.254
    extrude(body_2.faces().sort_by_distance((123.825, 63.5, -44.45))[0], amount=MOVE_FACE4_6_BY, dir=(-1, 0, 0), mode=Mode.SUBTRACT)

    # Move Face4 7: a face moved inward by 0.254
    extrude(body_2.faces().sort_by_distance((63.5, 63.5, -3.175))[0], amount=MOVE_FACE4_7_BY, dir=(0, 0, -1), mode=Mode.SUBTRACT)

    # Move Face4 8: a curved face moved inward by 0.254
    add(Solid.thicken(body_2.faces().sort_by_distance((118.245384182, 63.5, -8.754615818))[0], -MOVE_FACE4_8_BY), mode=Mode.SUBTRACT)


solid = Compound([part.part, body_2.part])
